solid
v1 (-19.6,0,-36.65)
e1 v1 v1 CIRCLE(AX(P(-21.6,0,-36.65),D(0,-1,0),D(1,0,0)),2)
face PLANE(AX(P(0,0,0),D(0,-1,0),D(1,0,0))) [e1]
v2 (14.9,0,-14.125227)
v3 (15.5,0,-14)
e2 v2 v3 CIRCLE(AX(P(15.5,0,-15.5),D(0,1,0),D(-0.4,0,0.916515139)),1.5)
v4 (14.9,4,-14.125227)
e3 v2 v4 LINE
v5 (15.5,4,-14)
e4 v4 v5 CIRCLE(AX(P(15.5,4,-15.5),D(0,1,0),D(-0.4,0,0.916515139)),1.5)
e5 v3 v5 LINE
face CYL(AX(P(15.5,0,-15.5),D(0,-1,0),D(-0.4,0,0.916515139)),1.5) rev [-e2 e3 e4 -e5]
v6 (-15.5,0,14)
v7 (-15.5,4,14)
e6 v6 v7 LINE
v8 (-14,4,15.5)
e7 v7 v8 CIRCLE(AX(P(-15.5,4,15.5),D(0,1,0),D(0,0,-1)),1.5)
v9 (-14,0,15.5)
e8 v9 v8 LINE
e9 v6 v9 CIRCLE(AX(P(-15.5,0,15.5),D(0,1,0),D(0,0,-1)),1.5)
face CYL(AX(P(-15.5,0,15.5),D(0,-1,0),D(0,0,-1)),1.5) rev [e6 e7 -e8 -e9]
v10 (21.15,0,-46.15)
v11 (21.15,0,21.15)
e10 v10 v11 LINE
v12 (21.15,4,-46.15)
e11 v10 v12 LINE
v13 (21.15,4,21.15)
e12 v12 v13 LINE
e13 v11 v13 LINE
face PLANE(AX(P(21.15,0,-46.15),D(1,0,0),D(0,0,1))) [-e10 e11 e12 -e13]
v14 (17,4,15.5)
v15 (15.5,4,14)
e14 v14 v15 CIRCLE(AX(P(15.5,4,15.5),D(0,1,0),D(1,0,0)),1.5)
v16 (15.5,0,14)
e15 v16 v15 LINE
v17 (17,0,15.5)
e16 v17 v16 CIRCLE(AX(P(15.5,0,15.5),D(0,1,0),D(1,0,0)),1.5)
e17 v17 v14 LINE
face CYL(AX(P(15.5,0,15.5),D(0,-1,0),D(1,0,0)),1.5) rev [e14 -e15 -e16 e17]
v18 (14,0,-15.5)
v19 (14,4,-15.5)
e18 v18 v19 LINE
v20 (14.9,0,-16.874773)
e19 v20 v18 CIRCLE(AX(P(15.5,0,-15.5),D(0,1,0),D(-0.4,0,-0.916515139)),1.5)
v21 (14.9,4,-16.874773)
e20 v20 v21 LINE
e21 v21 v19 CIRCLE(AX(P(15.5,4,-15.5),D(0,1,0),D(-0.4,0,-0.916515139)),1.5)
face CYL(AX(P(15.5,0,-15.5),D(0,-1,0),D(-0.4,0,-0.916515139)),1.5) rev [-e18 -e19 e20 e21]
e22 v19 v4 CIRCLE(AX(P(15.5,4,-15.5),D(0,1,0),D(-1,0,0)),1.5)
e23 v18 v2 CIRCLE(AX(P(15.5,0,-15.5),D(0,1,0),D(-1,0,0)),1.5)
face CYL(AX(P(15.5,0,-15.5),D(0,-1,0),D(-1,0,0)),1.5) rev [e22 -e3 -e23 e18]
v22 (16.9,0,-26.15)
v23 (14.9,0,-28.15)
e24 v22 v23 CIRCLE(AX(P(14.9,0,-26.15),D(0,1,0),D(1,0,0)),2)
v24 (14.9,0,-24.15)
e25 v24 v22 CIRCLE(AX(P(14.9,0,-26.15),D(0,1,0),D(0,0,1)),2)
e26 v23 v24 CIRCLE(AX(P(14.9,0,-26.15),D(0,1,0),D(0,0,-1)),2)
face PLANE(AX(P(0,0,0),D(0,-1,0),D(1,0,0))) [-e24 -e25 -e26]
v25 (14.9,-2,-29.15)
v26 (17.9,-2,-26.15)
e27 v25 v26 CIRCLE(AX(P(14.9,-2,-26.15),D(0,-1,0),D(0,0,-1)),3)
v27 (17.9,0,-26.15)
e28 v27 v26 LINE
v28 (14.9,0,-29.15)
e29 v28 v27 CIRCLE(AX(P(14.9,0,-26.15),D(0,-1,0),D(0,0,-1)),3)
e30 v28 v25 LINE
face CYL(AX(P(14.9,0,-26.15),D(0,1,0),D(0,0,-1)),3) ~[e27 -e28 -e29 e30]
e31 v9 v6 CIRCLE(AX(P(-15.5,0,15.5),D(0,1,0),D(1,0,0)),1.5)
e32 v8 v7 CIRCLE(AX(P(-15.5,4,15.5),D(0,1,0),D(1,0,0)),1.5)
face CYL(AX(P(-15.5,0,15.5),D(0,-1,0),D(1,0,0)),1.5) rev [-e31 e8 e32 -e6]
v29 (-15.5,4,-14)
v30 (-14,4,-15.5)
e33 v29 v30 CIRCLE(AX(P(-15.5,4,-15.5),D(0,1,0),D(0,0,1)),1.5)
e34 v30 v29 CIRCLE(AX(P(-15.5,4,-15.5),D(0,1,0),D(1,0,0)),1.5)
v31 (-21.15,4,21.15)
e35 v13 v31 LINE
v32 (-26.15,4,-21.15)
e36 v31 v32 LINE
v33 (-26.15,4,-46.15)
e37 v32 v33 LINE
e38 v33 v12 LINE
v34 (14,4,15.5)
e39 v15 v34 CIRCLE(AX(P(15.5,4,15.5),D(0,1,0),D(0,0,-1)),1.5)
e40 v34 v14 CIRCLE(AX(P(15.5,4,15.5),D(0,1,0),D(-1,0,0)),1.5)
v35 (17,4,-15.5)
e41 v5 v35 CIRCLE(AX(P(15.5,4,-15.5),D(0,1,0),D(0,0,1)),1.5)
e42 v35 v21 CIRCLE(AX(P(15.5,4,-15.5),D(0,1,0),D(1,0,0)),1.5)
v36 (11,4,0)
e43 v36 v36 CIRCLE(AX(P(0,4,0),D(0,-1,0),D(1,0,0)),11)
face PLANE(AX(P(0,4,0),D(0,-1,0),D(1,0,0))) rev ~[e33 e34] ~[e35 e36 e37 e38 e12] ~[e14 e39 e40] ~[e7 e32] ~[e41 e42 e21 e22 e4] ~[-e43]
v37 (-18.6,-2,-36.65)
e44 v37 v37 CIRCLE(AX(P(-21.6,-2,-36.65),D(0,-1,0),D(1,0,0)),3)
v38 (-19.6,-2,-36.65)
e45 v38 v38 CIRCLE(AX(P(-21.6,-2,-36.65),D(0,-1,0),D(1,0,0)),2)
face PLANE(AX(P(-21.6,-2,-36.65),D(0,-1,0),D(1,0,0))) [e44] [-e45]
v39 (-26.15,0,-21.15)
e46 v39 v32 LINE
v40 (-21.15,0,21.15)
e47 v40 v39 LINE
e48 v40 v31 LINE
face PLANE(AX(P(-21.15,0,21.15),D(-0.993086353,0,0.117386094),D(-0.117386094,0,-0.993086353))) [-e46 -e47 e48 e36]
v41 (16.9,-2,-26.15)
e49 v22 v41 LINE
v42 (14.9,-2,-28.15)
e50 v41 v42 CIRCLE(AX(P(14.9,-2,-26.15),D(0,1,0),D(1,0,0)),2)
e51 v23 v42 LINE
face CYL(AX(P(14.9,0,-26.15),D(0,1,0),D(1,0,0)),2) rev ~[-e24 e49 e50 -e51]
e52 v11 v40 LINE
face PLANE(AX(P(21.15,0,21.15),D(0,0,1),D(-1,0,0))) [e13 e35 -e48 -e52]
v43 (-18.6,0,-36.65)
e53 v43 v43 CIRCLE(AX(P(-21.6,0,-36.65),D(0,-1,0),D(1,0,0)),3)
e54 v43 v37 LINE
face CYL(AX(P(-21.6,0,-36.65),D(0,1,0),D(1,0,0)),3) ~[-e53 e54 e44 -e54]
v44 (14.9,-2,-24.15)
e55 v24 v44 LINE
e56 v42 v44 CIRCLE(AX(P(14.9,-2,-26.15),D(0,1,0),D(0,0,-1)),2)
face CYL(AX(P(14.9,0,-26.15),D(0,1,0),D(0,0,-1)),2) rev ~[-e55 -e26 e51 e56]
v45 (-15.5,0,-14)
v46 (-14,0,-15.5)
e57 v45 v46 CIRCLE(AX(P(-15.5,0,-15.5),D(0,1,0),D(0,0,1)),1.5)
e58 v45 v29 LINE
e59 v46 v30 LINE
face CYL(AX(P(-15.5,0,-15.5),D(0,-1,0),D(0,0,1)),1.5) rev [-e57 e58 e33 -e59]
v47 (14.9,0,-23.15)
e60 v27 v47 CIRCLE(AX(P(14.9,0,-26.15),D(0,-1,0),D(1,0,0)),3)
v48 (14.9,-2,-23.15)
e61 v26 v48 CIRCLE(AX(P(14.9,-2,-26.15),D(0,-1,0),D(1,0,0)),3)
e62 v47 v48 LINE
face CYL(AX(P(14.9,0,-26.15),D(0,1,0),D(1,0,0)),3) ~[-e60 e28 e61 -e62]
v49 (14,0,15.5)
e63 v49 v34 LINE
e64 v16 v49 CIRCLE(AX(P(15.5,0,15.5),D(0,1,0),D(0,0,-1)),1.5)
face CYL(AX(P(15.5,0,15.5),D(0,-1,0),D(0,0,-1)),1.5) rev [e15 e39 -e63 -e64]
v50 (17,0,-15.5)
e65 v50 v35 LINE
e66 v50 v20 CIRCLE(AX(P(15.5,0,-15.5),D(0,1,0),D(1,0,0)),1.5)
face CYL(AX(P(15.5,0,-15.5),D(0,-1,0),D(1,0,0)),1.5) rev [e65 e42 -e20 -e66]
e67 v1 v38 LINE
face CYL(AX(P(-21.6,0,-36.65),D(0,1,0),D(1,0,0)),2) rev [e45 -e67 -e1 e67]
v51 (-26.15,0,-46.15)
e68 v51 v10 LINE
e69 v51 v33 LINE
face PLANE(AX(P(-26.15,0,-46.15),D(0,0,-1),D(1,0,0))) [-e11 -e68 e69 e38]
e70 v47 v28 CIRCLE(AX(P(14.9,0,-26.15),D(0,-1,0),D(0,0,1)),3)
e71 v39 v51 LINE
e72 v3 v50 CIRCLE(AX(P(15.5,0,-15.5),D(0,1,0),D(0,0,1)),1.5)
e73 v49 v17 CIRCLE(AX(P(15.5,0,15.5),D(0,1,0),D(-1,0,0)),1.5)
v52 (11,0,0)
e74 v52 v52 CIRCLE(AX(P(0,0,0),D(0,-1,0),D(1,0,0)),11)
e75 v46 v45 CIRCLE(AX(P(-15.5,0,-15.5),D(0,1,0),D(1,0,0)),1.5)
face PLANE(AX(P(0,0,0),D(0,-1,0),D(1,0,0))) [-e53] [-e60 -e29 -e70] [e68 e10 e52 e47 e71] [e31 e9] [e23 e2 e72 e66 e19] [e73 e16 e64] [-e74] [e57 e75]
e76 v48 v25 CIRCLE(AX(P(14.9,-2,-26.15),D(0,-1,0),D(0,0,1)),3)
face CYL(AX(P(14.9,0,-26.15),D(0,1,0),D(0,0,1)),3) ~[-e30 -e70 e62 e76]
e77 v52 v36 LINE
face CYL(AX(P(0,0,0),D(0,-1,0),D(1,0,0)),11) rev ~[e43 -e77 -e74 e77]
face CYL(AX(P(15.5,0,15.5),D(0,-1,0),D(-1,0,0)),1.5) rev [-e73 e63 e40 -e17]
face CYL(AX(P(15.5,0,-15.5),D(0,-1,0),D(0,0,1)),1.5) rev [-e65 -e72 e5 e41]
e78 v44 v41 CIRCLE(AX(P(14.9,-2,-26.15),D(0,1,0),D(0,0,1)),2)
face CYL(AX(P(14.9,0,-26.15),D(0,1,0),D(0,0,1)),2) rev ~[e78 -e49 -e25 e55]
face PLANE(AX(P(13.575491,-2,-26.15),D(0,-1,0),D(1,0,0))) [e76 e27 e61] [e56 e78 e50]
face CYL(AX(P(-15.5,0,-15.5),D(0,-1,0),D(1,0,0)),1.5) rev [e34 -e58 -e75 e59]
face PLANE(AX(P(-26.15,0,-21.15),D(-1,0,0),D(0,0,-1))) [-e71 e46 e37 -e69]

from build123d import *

# Parameters (mm, degrees)
F0_R     = 3
F0_R_2   = 11
F0_R_3   = 2
F1_DEPTH = 4
F2_DEPTH = 2


# Not quite as in the source:
# - a feature names something its author has since deleted; it is built from what else it names


with BuildPart() as f1:
    # F0 (on Front) → F1 (new body)
    with BuildSketch(Plane.XZ):
        Polygon((14.9, -21.15), (21.15, -21.15), (21.15, 21.15), (5.15, 21.15), (-21.15, 21.15), (-21.15, -21.15), align=None)
        with BuildLine():
            ThreePointArc((17, -15.5), (16.3215838363, -16.7549900398), (14.9, -16.8747727085))
            ThreePointArc((14.9, -16.8747727085), (14.2450099602, -16.3215838363), (14, -15.5))
            Line((14, -15.5), (-14, -15.5))
            ThreePointArc((-14, -15.5), (-16.5606601718, -16.5606601718), (-15.5, -14))
            Line((-15.5, -14), (-15.5, 14))
            ThreePointArc((-15.5, 14), (-16.5606601718, 16.5606601718), (-14, 15.5))
            Line((-14, 15.5), (14, 15.5))
            ThreePointArc((14, 15.5), (15.5, 17), (17, 15.5))
            ThreePointArc((17, 15.5), (16.5606601718, 14.4393398282), (15.5, 14))
            Line((15.5, 14), (15.5, -14))
            ThreePointArc((15.5, -14), (16.5606601718, -14.4393398282), (17, -15.5))
        make_face(mode=Mode.SUBTRACT)
        Polygon((21.15, -46.15), (21.15, -21.15), (14.9, -21.15), (-21.15, -21.15), (-26.15, -21.15), (-26.15, -41.15), (-26.15, -46.15), (-21.15, -46.15), align=None)
        with Locations((-21.6, -36.65)):
            Circle(F0_R, mode=Mode.SUBTRACT)
        with BuildLine():
            ThreePointArc((14.9, -29.15), (11.9, -26.15), (14.9, -23.15))
            ThreePointArc((14.9, -23.15), (17.0213203436, -24.0286796564), (17.9, -26.15))
            ThreePointArc((17.9, -26.15), (17.0213203436, -28.2713203436), (14.9, -29.15))
        make_face(mode=Mode.SUBTRACT)
        with BuildLine():
            Line((-14, -15.5), (14, -15.5))
            ThreePointArc((14, -15.5), (14.2450099602, -14.6784161637), (14.9, -14.1252272915))
            ThreePointArc((14.9, -14.1252272915), (15.1935355345, -14.0316405306), (15.5, -14))
            Line((15.5, -14), (15.5, 14))
            ThreePointArc((15.5, 14), (14.4393398282, 14.4393398282), (14, 15.5))
            Line((14, 15.5), (-14, 15.5))
            ThreePointArc((-14, 15.5), (-14.4393398282, 14.4393398282), (-15.5, 14))
            Line((-15.5, 14), (-15.5, -14))
            ThreePointArc((-15.5, -14), (-14.4393398282, -14.4393398282), (-14, -15.5))
        make_face()
        Circle(F0_R_2, mode=Mode.SUBTRACT)
        Polygon((-26.15, -21.15), (-21.15, -21.15), (-21.15, 21.15), align=None)
        with Locations((-21.6, -36.65)):
            Circle(F0_R)
        with Locations((-21.6, -36.65)):
            Circle(F0_R_3, mode=Mode.SUBTRACT)
        with Locations((-21.6, -36.65)):
            Circle(F0_R_3)
        with BuildLine():
            ThreePointArc((17.9, -26.15), (17.0213203436, -24.0286796564), (14.9, -23.15))
            Line((14.9, -23.15), (14.9, -24.15))
            ThreePointArc((14.9, -24.15), (16.3142135624, -24.7357864376), (16.9, -26.15))
            ThreePointArc((16.9, -26.15), (16.3142135624, -27.5642135624), (14.9, -28.15))
            Line((14.9, -28.15), (14.9, -29.15))
            ThreePointArc((14.9, -29.15), (17.0213203436, -28.2713203436), (17.9, -26.15))
        make_face()
        with BuildLine():
            Line((14.9, -24.15), (14.9, -23.15))
            ThreePointArc((14.9, -23.15), (11.9, -26.15), (14.9, -29.15))
            Line((14.9, -29.15), (14.9, -28.15))
            ThreePointArc((14.9, -28.15), (12.9, -26.15), (14.9, -24.15))
        make_face()
        with BuildLine():
            ThreePointArc((16.9, -26.15), (16.3142135624, -24.7357864376), (14.9, -24.15))
            Line((14.9, -24.15), (14.9, -26.15))
            Line((14.9, -26.15), (14.9, -28.15))
            ThreePointArc((14.9, -28.15), (16.3142135624, -27.5642135624), (16.9, -26.15))
        make_face()
        with BuildLine():
            Line((14.9, -26.15), (14.9, -24.15))
            ThreePointArc((14.9, -24.15), (12.9, -26.15), (14.9, -28.15))
            Line((14.9, -28.15), (14.9, -26.15))
        make_face()
    extrude(amount=-F1_DEPTH)

    # F0 (on Front) → F2 (join)
    with BuildSketch(Plane.XZ):
        with BuildLine():
            Line((14.9, -24.15), (14.9, -23.15))
            ThreePointArc((14.9, -23.15), (11.9, -26.15), (14.9, -29.15))
            Line((14.9, -29.15), (14.9, -28.15))
            ThreePointArc((14.9, -28.15), (12.9, -26.15), (14.9, -24.15))
        make_face()
        with BuildLine():
            ThreePointArc((17.9, -26.15), (17.0213203436, -24.0286796564), (14.9, -23.15))
            Line((14.9, -23.15), (14.9, -24.15))
            ThreePointArc((14.9, -24.15), (16.3142135624, -24.7357864376), (16.9, -26.15))
            ThreePointArc((16.9, -26.15), (16.3142135624, -27.5642135624), (14.9, -28.15))
            Line((14.9, -28.15), (14.9, -29.15))
            ThreePointArc((14.9, -29.15), (17.0213203436, -28.2713203436), (17.9, -26.15))
        make_face()
        with Locations((-21.6, -36.65)):
            Circle(F0_R)
        with Locations((-21.6, -36.65)):
            Circle(F0_R_3, mode=Mode.SUBTRACT)
    extrude(amount=F2_DEPTH)


solid = f1.part
